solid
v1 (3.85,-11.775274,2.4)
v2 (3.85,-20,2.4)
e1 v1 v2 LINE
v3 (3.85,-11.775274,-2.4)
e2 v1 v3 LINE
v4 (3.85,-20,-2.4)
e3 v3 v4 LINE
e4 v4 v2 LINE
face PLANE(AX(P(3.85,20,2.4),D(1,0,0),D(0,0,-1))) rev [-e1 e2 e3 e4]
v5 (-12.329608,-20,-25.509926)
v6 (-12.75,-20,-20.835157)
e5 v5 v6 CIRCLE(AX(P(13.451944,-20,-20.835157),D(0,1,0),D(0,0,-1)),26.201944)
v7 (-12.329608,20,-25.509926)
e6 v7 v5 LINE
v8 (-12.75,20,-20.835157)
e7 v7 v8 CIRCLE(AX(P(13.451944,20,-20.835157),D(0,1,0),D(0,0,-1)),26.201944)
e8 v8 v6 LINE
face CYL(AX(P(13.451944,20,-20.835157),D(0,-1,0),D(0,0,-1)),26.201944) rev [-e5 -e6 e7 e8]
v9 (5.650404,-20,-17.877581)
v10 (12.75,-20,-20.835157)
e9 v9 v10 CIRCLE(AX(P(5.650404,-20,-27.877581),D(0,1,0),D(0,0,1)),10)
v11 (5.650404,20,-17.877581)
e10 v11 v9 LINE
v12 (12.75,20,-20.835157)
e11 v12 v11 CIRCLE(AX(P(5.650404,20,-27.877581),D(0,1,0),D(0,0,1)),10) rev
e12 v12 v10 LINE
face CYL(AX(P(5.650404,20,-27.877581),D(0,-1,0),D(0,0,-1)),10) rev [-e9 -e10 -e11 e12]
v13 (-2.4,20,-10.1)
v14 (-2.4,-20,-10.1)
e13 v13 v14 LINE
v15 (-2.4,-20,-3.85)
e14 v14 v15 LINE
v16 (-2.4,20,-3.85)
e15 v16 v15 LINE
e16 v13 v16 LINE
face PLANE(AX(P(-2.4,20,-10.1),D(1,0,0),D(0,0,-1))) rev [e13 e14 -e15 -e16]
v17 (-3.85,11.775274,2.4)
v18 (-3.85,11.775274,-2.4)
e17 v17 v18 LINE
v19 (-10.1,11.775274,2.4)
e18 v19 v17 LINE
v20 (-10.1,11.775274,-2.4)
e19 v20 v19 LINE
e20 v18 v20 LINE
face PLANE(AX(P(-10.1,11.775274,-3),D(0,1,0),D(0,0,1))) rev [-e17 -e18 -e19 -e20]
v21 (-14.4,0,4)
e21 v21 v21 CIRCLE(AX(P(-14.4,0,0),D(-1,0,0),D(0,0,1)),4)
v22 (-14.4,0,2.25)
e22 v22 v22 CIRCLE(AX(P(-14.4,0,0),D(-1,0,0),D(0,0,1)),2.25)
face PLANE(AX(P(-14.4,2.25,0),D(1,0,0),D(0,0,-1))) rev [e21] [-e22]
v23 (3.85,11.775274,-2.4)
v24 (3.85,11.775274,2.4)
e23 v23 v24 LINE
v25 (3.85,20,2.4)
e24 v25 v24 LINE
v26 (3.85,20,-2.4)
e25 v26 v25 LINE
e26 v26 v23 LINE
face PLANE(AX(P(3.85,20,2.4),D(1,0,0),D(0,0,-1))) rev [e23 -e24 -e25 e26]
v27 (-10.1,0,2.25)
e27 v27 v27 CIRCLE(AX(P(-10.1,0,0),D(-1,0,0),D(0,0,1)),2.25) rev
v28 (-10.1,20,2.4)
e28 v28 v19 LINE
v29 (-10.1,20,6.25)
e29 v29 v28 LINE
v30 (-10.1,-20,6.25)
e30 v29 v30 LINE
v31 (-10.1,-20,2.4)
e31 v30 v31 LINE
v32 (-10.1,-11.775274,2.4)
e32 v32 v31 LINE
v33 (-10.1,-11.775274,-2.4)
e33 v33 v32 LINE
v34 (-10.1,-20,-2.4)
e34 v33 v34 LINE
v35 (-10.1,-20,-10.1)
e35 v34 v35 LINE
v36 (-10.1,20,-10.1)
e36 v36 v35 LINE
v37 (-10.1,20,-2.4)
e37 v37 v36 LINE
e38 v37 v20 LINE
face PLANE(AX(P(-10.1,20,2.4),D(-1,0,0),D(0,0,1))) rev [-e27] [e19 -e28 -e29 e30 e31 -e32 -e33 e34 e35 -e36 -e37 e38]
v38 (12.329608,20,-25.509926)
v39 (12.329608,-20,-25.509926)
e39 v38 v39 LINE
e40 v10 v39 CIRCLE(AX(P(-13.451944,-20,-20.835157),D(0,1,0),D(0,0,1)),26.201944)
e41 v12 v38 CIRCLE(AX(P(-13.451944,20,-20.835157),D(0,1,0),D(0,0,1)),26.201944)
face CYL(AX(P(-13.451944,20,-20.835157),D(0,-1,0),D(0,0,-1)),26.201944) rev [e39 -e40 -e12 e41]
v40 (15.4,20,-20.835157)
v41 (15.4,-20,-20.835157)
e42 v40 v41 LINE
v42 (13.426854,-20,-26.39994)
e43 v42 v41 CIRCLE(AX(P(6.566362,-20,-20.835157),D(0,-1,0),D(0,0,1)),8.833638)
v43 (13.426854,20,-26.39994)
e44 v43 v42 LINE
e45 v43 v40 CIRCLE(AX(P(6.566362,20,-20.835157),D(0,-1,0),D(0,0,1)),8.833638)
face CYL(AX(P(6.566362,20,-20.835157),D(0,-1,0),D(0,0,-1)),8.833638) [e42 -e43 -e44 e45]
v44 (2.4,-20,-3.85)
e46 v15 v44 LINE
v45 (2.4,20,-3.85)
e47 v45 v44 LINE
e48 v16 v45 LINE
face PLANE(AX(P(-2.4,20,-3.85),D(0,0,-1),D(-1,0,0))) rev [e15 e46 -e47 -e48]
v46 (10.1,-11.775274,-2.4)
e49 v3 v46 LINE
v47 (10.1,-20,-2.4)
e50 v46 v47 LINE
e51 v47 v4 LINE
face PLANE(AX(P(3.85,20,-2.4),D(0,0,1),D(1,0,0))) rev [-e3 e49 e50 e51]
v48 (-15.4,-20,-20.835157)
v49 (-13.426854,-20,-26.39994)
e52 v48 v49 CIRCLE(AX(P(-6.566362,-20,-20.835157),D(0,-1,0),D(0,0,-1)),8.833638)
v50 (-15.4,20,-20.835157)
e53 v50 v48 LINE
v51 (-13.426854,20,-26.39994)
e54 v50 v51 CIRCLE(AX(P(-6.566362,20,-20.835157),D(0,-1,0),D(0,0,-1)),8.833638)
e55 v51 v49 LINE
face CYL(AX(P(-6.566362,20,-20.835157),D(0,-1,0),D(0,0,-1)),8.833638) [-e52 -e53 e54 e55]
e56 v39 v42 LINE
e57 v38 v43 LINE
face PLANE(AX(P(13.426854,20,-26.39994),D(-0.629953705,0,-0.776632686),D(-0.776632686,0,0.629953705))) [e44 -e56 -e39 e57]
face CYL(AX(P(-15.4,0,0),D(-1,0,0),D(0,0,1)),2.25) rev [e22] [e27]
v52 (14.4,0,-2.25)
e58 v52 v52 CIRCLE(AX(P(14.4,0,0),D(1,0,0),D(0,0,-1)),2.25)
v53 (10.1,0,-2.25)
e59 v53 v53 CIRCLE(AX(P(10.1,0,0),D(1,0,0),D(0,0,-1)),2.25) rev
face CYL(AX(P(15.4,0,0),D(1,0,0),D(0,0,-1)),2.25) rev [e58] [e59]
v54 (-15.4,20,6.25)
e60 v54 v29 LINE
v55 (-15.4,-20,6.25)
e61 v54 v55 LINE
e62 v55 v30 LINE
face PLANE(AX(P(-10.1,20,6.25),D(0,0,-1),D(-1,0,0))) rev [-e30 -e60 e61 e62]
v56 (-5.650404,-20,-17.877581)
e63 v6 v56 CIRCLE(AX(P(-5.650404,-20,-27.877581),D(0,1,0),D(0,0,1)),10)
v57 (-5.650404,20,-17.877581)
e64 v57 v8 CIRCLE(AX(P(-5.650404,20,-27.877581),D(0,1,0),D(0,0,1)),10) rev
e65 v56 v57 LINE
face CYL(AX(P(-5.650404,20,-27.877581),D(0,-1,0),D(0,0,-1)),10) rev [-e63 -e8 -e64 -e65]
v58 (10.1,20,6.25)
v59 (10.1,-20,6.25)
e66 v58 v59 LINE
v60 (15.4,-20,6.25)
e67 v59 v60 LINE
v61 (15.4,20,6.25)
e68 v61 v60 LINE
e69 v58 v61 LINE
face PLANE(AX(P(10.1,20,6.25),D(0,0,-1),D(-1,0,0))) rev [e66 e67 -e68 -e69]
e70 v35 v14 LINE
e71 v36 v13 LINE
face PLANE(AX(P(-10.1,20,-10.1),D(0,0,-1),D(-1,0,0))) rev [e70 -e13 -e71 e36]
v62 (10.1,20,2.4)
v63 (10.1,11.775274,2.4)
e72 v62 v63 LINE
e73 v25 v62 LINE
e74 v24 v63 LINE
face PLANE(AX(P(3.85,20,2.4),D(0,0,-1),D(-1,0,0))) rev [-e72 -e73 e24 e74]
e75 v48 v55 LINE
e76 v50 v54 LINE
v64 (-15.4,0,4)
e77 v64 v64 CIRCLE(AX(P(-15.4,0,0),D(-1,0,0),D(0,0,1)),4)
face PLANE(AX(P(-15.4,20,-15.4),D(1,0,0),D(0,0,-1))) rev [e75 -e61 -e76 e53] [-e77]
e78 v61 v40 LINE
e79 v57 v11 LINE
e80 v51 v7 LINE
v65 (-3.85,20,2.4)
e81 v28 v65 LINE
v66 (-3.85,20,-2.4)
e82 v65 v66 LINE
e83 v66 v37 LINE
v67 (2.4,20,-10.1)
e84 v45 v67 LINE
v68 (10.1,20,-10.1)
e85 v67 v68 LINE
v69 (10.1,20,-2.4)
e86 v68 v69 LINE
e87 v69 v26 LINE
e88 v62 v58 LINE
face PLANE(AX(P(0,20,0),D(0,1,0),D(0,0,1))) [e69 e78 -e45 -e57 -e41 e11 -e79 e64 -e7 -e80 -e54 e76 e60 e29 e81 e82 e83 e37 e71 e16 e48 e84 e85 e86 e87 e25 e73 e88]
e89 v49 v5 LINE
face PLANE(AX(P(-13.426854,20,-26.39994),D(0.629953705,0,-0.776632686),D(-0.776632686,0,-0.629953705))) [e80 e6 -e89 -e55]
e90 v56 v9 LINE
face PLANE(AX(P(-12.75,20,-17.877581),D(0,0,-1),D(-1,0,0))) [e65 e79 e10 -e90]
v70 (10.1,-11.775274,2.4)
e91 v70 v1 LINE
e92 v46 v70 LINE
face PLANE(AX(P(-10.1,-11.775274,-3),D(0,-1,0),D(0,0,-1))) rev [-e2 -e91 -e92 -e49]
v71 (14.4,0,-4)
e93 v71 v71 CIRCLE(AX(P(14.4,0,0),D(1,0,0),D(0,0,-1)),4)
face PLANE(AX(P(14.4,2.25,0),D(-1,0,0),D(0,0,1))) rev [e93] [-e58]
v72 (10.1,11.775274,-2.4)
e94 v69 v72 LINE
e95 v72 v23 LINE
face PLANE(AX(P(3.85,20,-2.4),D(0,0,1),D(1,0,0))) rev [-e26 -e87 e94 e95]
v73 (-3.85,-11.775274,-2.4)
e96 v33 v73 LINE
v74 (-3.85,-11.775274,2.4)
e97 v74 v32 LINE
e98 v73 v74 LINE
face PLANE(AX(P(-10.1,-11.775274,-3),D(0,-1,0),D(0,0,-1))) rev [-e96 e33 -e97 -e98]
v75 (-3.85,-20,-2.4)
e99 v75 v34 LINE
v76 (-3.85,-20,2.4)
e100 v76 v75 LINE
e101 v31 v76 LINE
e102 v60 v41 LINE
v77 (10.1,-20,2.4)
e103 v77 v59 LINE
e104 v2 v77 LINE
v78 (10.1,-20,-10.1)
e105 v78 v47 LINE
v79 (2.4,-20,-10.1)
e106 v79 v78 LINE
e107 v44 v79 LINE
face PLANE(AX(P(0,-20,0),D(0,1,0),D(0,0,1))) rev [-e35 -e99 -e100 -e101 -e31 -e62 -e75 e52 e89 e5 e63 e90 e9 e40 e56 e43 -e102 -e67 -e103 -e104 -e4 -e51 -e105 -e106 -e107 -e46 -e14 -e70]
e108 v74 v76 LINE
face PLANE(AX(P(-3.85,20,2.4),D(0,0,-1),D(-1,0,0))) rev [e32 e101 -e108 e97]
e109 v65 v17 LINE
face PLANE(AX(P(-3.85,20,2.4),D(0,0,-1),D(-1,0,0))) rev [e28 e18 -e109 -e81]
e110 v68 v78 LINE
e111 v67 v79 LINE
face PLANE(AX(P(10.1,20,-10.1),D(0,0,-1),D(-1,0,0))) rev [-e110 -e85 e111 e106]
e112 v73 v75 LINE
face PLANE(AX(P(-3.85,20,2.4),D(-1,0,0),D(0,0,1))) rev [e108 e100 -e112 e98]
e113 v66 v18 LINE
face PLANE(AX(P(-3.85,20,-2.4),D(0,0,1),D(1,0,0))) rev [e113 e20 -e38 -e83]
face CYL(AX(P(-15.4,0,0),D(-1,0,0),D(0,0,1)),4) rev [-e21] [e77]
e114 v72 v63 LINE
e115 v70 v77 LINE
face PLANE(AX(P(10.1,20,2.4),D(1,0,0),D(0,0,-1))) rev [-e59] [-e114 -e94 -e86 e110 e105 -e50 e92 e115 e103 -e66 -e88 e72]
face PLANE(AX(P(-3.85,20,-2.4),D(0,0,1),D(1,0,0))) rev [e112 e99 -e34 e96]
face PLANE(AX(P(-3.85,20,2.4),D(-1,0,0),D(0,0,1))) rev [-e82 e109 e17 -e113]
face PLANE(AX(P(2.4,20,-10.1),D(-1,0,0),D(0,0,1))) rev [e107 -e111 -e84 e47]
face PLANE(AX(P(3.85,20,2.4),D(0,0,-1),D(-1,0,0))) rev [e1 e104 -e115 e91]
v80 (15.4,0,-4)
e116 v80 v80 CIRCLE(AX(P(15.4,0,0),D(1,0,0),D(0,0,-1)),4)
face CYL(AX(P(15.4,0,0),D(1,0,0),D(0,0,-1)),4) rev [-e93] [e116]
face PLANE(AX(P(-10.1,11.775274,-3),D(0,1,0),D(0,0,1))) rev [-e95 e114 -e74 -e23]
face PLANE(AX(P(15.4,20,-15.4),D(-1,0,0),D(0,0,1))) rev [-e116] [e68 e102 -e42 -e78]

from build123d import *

# Parameters (mm, degrees)
BOSS_EXTRU_1_DEPTH                                = 20
CHAMBRAGE_POUR_VIS_SIX_PANS_CREUX_M41_D           = 4.5
CHAMBRAGE_POUR_VIS_SIX_PANS_CREUX_M41_DEPTH       = 11.55
CHAMBRAGE_POUR_VIS_SIX_PANS_CREUX_M41_CBORE_D     = 8
CHAMBRAGE_POUR_VIS_SIX_PANS_CREUX_M41_CBORE_DEPTH = 1
ESQUISSE6_W                                       = 20.2
ESQUISSE6_H                                       = 23.55054775
ENL_V_MAT_EXTRU_1_DEPTH                           = 3
BOSS_EXTRU_3_DEPTH                                = 40
CONG_1_R                                          = 10


with BuildPart() as part:
    # Base → Boss.-Extru.1 (new, symmetric)
    with BuildSketch(Plane(origin=(0, 0, 0), x_dir=(1, 0, 0), z_dir=(0, 1, 0))):
        Polygon((-3.85, -2.4), (-3.85, 2.4), (-10.1, 2.4), (-10.1, 10.1), (-2.4, 10.1), (-2.4, 3.85), (2.4, 3.85), (2.4, 10.1), (10.1, 10.1), (10.1, 2.4), (3.85, 2.4), (3.85, -2.4), (10.1, -2.4), (10.1, -6.25), (15.4, -6.25), (15.4, 15.4), (-15.4, 15.4), (-15.4, -6.25), (-10.1, -6.25), (-10.1, -2.4), align=None)
    extrude(amount=BOSS_EXTRU_1_DEPTH, both=True)

    # Chambrage pour vis à six pans creux M41
    with Locations(Plane(origin=(15.4, 0, 0), x_dir=(0, 0, -1), z_dir=(1, 0, 0))):
        with Locations((0, 0)):
            chambrage_pour_vis_six_pans_creux_m41 = CounterBoreHole(CHAMBRAGE_POUR_VIS_SIX_PANS_CREUX_M41_D / 2, CHAMBRAGE_POUR_VIS_SIX_PANS_CREUX_M41_CBORE_D / 2, CHAMBRAGE_POUR_VIS_SIX_PANS_CREUX_M41_CBORE_DEPTH, depth=CHAMBRAGE_POUR_VIS_SIX_PANS_CREUX_M41_DEPTH)

    # Symétrie1: Chambrage pour vis à six pans creux M41 across plane
    add(chambrage_pour_vis_six_pans_creux_m41.mirror(Plane(origin=(0, 0, 0), x_dir=(0, 0, 1), z_dir=(1, 0, 0))), mode=Mode.SUBTRACT)

    # Esquisse6 → Enlèv. mat.-Extru.1 (cut, symmetric)
    with BuildSketch(Plane.XY):
        Rectangle(ESQUISSE6_W, ESQUISSE6_H)
    extrude(amount=ENL_V_MAT_EXTRU_1_DEPTH, both=True, mode=Mode.SUBTRACT)

    # Esquisse14 → Boss.-Extru.3 (add)
    with BuildSketch(Plane.XZ.offset(20)):
        with BuildLine():
            Line((-15.4, -15.4), (15.4, -15.4))
            Line((15.4, -15.4), (15.4, -17.9))
            Line((15.4, -17.9), (15.4, -20.835156926))
            ThreePointArc((15.4, -20.835156926), (14.892113101, -23.787279745), (13.42685396, -26.399940055))
            Line((13.42685396, -26.399940055), (12.329607692, -25.509925555))
            ThreePointArc((12.329607692, -25.509925555), (12.644690295, -23.181973462), (12.75, -20.835156926))
            Line((12.75, -20.835156926), (12.75, -17.87758102))
            Line((12.75, -17.87758102), (-12.75, -17.87758102))
            Line((-12.75, -17.87758102), (-12.75, -20.835156926))
            ThreePointArc((-12.75, -20.835156926), (-12.644690295, -23.181973462), (-12.329607692, -25.509925555))
            Line((-12.329607692, -25.509925555), (-13.42685396, -26.399940055))
            ThreePointArc((-13.42685396, -26.399940055), (-14.892113101, -23.787279745), (-15.4, -20.835156926))
            Line((-15.4, -20.835156926), (-15.4, -17.9))
            Line((-15.4, -17.9), (-15.4, -15.4))
        make_face()
    extrude(amount=-BOSS_EXTRU_3_DEPTH)

    # Congé1
    # the kernel refuses this fillet: 10 mm, written as the material it adds along each edge
    with BuildSketch(Plane(origin=(-12.75, -20, -17.87758102), x_dir=(0, 0, -1), z_dir=(0, 1, 0))) as cong_1_piece_1:
        with BuildLine():
            CenterArc((10, -7.099595966), CONG_1_R, 134.768371909, 45.231628091)
            Line((0, -7.099595966), (0, 0))
            Line((0, 0), (2.957575906, 0))
        make_face()
    extrude(amount=40)
    with BuildSketch(Plane(origin=(12.75, -20, -17.87758102), x_dir=(-1, 0, 0), z_dir=(0, 1, 0))) as cong_1_piece_2:
        with BuildLine():
            CenterArc((7.099595966, -10), CONG_1_R, 90, 45.231628091)
            Line((0, -2.957575906), (0, 0))
            Line((0, 0), (7.099595966, 0))
        make_face()
    extrude(amount=40)


solid = part.part
